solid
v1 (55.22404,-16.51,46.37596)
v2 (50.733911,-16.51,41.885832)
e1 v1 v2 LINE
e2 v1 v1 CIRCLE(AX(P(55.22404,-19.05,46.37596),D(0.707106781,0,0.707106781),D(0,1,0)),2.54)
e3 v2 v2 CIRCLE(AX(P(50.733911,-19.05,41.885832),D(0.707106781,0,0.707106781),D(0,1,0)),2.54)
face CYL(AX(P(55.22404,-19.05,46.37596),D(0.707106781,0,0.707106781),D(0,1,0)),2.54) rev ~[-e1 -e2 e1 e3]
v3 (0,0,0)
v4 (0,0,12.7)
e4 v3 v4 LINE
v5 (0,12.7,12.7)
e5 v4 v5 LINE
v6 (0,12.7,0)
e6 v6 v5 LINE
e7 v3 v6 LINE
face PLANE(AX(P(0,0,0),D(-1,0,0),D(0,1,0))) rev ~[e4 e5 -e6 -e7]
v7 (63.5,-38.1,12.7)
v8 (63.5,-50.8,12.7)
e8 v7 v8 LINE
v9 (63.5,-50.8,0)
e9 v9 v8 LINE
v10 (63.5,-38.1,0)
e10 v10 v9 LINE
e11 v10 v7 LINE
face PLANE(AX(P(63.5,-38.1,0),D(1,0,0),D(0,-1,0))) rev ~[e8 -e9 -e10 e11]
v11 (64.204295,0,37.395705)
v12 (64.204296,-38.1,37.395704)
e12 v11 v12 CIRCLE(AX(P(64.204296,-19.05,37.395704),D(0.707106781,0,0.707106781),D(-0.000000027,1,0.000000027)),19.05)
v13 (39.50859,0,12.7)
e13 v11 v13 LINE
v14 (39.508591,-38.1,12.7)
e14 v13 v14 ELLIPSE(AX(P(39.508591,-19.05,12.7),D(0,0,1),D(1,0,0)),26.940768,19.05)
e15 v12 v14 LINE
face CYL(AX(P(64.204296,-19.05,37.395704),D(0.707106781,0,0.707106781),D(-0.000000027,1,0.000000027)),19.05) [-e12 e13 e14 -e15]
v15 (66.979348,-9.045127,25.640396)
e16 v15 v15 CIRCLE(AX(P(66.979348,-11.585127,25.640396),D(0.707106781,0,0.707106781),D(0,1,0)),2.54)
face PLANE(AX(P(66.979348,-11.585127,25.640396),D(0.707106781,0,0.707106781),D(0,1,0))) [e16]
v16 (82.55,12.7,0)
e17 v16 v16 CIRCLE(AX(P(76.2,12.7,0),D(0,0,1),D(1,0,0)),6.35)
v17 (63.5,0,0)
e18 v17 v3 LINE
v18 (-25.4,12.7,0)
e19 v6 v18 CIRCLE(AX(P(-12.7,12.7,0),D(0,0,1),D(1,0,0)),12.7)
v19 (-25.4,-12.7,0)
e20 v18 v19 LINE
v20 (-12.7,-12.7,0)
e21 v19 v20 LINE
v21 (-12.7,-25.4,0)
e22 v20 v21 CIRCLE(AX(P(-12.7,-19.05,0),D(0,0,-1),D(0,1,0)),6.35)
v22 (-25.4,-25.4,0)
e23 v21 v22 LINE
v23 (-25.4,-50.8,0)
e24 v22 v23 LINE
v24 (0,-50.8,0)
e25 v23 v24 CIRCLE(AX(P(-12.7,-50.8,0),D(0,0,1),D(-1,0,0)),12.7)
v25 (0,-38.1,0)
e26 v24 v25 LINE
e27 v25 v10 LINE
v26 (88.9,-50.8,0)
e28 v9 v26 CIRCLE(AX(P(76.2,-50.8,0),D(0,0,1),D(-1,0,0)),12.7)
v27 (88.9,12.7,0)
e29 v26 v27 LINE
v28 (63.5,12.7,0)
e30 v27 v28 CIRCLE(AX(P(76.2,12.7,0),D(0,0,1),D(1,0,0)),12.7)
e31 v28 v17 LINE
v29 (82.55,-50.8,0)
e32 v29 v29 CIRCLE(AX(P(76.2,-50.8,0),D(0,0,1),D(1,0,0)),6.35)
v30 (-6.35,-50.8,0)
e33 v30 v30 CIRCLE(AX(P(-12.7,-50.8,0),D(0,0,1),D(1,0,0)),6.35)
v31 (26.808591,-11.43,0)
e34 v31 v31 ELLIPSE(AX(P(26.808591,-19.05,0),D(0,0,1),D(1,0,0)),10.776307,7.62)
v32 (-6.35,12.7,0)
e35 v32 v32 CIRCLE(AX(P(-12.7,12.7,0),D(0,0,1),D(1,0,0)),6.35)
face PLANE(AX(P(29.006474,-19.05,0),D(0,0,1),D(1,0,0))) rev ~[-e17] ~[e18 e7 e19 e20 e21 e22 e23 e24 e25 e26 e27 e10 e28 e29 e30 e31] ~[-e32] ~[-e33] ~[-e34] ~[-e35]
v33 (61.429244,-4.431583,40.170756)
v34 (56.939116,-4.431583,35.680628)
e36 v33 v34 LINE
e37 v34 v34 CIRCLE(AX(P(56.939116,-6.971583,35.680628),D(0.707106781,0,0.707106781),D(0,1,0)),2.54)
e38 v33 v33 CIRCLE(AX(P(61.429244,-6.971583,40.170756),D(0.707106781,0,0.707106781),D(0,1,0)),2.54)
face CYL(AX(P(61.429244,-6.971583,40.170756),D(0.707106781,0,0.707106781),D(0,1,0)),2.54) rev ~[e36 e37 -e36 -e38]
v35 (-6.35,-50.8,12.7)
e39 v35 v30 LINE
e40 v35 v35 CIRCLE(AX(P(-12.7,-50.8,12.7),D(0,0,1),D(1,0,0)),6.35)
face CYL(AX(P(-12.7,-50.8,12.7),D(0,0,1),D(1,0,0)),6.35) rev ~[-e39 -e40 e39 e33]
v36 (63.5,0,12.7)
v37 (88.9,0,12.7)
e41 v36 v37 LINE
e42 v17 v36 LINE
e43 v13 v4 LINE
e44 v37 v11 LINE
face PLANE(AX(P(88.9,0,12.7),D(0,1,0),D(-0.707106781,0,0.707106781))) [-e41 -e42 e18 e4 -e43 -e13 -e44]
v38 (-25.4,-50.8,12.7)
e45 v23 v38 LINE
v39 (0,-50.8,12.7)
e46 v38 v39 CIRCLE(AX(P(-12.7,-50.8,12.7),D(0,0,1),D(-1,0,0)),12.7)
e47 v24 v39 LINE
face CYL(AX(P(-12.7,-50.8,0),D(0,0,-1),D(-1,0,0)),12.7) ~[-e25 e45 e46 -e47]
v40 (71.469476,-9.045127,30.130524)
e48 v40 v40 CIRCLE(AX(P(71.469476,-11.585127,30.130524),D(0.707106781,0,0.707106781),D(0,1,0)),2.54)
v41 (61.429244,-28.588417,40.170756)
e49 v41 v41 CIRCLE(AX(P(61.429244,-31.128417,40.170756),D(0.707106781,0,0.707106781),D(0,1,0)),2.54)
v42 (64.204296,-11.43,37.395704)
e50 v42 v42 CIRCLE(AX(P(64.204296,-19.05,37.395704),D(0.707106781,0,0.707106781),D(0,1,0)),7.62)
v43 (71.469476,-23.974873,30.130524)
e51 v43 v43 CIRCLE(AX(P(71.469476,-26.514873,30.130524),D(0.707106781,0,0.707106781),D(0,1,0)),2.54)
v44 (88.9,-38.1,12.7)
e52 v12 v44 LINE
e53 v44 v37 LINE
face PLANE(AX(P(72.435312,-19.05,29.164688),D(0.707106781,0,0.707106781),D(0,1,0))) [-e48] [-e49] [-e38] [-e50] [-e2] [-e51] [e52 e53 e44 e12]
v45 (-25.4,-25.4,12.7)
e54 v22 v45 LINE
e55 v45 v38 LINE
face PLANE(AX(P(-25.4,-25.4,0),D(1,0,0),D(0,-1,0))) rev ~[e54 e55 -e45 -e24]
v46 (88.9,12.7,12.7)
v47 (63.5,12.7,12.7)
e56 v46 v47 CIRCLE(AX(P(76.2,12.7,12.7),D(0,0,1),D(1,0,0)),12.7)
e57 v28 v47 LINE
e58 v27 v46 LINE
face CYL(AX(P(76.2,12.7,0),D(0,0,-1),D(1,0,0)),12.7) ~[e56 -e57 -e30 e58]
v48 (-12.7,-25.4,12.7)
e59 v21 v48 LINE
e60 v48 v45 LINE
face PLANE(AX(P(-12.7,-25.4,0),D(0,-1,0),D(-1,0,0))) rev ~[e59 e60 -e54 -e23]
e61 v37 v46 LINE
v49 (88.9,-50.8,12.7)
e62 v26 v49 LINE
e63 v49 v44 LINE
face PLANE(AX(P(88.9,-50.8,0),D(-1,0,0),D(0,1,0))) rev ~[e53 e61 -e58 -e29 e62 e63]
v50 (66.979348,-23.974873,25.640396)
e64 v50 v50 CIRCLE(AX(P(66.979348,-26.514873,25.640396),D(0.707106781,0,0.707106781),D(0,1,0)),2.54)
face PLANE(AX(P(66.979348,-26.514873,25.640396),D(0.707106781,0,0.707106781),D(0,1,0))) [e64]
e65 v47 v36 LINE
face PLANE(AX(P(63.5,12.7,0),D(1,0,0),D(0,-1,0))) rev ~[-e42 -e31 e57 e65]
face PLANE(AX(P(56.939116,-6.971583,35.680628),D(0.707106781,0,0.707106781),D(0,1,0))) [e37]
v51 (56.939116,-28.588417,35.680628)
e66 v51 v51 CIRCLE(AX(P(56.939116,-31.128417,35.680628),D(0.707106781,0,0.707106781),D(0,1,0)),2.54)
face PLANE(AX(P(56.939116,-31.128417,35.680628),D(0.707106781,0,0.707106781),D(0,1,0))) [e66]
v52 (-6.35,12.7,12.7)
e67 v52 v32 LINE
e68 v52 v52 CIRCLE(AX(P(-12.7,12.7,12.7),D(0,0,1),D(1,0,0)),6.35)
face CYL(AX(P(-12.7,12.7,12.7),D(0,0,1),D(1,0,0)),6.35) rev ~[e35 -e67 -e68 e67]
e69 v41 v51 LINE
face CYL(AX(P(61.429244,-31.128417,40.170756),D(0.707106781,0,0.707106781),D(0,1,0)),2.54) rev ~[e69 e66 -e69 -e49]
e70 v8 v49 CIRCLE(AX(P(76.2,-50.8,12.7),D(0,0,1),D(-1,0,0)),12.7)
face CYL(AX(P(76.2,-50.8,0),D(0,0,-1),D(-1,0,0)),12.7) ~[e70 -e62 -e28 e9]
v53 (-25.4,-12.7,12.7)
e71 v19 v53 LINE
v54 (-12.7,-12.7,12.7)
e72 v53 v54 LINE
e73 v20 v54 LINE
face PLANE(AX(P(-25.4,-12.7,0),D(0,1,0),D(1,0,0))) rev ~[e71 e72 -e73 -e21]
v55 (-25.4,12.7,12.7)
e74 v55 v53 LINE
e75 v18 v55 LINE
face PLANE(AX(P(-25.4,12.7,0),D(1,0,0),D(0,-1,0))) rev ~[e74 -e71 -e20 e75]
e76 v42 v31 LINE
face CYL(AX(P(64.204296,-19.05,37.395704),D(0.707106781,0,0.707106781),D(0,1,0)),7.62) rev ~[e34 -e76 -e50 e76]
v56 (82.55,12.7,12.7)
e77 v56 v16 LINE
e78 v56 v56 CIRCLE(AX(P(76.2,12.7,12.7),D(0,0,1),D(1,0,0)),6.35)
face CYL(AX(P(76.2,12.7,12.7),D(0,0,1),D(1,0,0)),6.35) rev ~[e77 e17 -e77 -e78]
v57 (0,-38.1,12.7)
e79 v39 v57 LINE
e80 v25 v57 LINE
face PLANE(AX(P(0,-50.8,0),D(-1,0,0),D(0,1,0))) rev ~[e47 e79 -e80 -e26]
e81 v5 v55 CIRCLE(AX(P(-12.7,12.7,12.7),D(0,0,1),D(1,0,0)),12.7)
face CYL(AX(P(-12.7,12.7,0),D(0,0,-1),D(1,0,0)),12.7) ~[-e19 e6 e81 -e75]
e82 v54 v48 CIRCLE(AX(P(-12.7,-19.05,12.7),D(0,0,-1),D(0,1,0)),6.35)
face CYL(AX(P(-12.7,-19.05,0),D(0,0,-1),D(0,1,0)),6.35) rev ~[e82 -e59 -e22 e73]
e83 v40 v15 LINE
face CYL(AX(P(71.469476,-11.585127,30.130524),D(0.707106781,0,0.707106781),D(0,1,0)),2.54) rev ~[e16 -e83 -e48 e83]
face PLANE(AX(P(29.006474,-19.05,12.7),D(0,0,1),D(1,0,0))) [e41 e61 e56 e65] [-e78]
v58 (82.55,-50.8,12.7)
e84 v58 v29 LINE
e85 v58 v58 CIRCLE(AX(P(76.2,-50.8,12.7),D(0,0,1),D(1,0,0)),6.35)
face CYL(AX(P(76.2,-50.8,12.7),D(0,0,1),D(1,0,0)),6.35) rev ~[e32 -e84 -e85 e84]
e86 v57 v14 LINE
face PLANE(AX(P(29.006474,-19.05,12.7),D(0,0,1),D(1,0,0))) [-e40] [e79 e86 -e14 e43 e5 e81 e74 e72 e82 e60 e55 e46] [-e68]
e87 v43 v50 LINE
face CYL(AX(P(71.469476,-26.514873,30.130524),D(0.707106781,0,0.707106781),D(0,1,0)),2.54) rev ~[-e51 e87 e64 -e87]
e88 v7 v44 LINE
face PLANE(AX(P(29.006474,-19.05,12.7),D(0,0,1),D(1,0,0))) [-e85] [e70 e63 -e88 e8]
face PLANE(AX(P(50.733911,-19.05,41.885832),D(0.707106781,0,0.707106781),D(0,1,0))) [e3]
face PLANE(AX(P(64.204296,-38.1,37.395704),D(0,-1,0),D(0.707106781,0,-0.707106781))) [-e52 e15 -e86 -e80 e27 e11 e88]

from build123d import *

# Parameters (mm, degrees)
F1_DEPTH          = 12.7
F2_R              = 6.35
F3_DEPTH          = 12.701
F8_R              = 7.62
F9_DEPTH          = 89.8035612107
F10_R             = 2.54
F11_DEPTH         = 6.35
F11_COPIES_COUNT  = 2
F11_COPIES_PITCH  = 14.929745
F11_COPIES1_COUNT = 2
F11_COPIES1_PITCH = 14.929745
F11_COPIES2_COUNT = 2
F11_COPIES2_PITCH = 24.156836
F11_COPIES3_COUNT = 2
F11_COPIES3_PITCH = 24.156836


# Not quite as in the source:
# - a pattern or mirror of a feature is missing from the dataset's text; its kind, count and spacing are read off the source's solid


with BuildPart() as f1:
    # F0 (on Top) → F1 (new body)
    with BuildSketch(Plane.XY):
        with BuildLine():
            Line((63.5, 0), (0, 0))
            Line((0, 0), (0, 12.7))
            ThreePointArc((0, 12.7), (-12.7, 25.4), (-25.4, 12.7))
            Line((-25.4, 12.7), (-25.4, -12.7))
            Line((-25.4, -12.7), (-12.7, -12.7))
            ThreePointArc((-12.7, -12.7), (-6.35, -19.05), (-12.7, -25.4))
            Line((-12.7, -25.4), (-25.4, -25.4))
            Line((-25.4, -25.4), (-25.4, -50.8))
            ThreePointArc((-25.4, -50.8), (-12.7, -63.5), (0, -50.8))
            Line((0, -50.8), (0, -38.1))
            Line((0, -38.1), (63.5, -38.1))
            Line((63.5, -38.1), (63.5, -50.8))
            ThreePointArc((63.5, -50.8), (76.2, -63.5), (88.9, -50.8))
            Line((88.9, -50.8), (88.9, 12.7))
            ThreePointArc((88.9, 12.7), (76.2, 25.4), (63.5, 12.7))
            Line((63.5, 12.7), (63.5, 0))
        make_face()
    extrude(amount=F1_DEPTH)

    # F2 (on face) → F3 (cut, through all)
    with BuildSketch(Plane.XY.offset(12.7)):
        with Locations((-12.7, 12.7)):
            Circle(F2_R)
        with Locations((76.2, 12.7)):
            Circle(F2_R)
        with Locations((76.2, -50.8)):
            Circle(F2_R)
        with Locations((-12.7, -50.8)):
            Circle(F2_R)
    extrude(amount=-F3_DEPTH, mode=Mode.SUBTRACT)

    # F6 (on face) → F7 (join, up to the next surface of F1)
    with BuildSketch(Plane(origin=(50.8, 0, 50.8), x_dir=(0, 1, 0), z_dir=(0.7071067812, 0, 0.7071067812))):
        with BuildLine():
            Line((-38.1, -18.9565367084), (-38.1, -53.8815367264))
            Line((-38.1, -53.8815367264), (0, -53.8815367264))
            Line((0, -53.8815367264), (0, -18.9565360082))
            ThreePointArc((0, -18.9565360082), (-19.0500003501, 0.0934632736), (-38.1, -18.9565367084))
        make_face()
    extrude(until=Until.NEXT, dir=(-0.7071067812, 0, -0.7071067812))

    # F8 (on face) → F9 (cut, through all)
    with BuildSketch(Plane(origin=(50.8, 0, 50.8), x_dir=(0, 1, 0), z_dir=(0.7071067812, 0, 0.7071067812))):
        with Locations((-19.05, -18.9565367264)):
            Circle(F8_R)
    extrude(amount=-F9_DEPTH, mode=Mode.SUBTRACT)

    # F10 (on face) → F11 (cut)
    with BuildSketch(Plane(origin=(50.8, 0, 50.8), x_dir=(0, 1, 0), z_dir=(0.7071067812, 0, 0.7071067812))):
        with Locations((-19.05, -6.2565367264)):
            Circle(F10_R)
    f11 = extrude(amount=-F11_DEPTH, mode=Mode.SUBTRACT)

    # F11_copies: F11 ×2
    with Locations(*[Vector(0.4156269378, -0.8090169944, -0.4156269378) * (i * F11_COPIES_PITCH) for i in range(1, F11_COPIES_COUNT)]):
        add(f11, mode=Mode.SUBTRACT)

    # F11_copies1: F11 ×2
    with Locations(*[Vector(0.4156269378, 0.8090169944, -0.4156269378) * (i * F11_COPIES1_PITCH) for i in range(1, F11_COPIES1_COUNT)]):
        add(f11, mode=Mode.SUBTRACT)

    # F11_copies2: F11 ×2
    with Locations(*[Vector(0.672498512, 0.3090169944, -0.672498512) * (i * F11_COPIES2_PITCH) for i in range(1, F11_COPIES2_COUNT)]):
        add(f11, mode=Mode.SUBTRACT)

    # F11_copies3: F11 ×2
    with Locations(*[Vector(0.672498512, -0.3090169944, -0.672498512) * (i * F11_COPIES3_PITCH) for i in range(1, F11_COPIES3_COUNT)]):
        add(f11, mode=Mode.SUBTRACT)


solid = f1.part
